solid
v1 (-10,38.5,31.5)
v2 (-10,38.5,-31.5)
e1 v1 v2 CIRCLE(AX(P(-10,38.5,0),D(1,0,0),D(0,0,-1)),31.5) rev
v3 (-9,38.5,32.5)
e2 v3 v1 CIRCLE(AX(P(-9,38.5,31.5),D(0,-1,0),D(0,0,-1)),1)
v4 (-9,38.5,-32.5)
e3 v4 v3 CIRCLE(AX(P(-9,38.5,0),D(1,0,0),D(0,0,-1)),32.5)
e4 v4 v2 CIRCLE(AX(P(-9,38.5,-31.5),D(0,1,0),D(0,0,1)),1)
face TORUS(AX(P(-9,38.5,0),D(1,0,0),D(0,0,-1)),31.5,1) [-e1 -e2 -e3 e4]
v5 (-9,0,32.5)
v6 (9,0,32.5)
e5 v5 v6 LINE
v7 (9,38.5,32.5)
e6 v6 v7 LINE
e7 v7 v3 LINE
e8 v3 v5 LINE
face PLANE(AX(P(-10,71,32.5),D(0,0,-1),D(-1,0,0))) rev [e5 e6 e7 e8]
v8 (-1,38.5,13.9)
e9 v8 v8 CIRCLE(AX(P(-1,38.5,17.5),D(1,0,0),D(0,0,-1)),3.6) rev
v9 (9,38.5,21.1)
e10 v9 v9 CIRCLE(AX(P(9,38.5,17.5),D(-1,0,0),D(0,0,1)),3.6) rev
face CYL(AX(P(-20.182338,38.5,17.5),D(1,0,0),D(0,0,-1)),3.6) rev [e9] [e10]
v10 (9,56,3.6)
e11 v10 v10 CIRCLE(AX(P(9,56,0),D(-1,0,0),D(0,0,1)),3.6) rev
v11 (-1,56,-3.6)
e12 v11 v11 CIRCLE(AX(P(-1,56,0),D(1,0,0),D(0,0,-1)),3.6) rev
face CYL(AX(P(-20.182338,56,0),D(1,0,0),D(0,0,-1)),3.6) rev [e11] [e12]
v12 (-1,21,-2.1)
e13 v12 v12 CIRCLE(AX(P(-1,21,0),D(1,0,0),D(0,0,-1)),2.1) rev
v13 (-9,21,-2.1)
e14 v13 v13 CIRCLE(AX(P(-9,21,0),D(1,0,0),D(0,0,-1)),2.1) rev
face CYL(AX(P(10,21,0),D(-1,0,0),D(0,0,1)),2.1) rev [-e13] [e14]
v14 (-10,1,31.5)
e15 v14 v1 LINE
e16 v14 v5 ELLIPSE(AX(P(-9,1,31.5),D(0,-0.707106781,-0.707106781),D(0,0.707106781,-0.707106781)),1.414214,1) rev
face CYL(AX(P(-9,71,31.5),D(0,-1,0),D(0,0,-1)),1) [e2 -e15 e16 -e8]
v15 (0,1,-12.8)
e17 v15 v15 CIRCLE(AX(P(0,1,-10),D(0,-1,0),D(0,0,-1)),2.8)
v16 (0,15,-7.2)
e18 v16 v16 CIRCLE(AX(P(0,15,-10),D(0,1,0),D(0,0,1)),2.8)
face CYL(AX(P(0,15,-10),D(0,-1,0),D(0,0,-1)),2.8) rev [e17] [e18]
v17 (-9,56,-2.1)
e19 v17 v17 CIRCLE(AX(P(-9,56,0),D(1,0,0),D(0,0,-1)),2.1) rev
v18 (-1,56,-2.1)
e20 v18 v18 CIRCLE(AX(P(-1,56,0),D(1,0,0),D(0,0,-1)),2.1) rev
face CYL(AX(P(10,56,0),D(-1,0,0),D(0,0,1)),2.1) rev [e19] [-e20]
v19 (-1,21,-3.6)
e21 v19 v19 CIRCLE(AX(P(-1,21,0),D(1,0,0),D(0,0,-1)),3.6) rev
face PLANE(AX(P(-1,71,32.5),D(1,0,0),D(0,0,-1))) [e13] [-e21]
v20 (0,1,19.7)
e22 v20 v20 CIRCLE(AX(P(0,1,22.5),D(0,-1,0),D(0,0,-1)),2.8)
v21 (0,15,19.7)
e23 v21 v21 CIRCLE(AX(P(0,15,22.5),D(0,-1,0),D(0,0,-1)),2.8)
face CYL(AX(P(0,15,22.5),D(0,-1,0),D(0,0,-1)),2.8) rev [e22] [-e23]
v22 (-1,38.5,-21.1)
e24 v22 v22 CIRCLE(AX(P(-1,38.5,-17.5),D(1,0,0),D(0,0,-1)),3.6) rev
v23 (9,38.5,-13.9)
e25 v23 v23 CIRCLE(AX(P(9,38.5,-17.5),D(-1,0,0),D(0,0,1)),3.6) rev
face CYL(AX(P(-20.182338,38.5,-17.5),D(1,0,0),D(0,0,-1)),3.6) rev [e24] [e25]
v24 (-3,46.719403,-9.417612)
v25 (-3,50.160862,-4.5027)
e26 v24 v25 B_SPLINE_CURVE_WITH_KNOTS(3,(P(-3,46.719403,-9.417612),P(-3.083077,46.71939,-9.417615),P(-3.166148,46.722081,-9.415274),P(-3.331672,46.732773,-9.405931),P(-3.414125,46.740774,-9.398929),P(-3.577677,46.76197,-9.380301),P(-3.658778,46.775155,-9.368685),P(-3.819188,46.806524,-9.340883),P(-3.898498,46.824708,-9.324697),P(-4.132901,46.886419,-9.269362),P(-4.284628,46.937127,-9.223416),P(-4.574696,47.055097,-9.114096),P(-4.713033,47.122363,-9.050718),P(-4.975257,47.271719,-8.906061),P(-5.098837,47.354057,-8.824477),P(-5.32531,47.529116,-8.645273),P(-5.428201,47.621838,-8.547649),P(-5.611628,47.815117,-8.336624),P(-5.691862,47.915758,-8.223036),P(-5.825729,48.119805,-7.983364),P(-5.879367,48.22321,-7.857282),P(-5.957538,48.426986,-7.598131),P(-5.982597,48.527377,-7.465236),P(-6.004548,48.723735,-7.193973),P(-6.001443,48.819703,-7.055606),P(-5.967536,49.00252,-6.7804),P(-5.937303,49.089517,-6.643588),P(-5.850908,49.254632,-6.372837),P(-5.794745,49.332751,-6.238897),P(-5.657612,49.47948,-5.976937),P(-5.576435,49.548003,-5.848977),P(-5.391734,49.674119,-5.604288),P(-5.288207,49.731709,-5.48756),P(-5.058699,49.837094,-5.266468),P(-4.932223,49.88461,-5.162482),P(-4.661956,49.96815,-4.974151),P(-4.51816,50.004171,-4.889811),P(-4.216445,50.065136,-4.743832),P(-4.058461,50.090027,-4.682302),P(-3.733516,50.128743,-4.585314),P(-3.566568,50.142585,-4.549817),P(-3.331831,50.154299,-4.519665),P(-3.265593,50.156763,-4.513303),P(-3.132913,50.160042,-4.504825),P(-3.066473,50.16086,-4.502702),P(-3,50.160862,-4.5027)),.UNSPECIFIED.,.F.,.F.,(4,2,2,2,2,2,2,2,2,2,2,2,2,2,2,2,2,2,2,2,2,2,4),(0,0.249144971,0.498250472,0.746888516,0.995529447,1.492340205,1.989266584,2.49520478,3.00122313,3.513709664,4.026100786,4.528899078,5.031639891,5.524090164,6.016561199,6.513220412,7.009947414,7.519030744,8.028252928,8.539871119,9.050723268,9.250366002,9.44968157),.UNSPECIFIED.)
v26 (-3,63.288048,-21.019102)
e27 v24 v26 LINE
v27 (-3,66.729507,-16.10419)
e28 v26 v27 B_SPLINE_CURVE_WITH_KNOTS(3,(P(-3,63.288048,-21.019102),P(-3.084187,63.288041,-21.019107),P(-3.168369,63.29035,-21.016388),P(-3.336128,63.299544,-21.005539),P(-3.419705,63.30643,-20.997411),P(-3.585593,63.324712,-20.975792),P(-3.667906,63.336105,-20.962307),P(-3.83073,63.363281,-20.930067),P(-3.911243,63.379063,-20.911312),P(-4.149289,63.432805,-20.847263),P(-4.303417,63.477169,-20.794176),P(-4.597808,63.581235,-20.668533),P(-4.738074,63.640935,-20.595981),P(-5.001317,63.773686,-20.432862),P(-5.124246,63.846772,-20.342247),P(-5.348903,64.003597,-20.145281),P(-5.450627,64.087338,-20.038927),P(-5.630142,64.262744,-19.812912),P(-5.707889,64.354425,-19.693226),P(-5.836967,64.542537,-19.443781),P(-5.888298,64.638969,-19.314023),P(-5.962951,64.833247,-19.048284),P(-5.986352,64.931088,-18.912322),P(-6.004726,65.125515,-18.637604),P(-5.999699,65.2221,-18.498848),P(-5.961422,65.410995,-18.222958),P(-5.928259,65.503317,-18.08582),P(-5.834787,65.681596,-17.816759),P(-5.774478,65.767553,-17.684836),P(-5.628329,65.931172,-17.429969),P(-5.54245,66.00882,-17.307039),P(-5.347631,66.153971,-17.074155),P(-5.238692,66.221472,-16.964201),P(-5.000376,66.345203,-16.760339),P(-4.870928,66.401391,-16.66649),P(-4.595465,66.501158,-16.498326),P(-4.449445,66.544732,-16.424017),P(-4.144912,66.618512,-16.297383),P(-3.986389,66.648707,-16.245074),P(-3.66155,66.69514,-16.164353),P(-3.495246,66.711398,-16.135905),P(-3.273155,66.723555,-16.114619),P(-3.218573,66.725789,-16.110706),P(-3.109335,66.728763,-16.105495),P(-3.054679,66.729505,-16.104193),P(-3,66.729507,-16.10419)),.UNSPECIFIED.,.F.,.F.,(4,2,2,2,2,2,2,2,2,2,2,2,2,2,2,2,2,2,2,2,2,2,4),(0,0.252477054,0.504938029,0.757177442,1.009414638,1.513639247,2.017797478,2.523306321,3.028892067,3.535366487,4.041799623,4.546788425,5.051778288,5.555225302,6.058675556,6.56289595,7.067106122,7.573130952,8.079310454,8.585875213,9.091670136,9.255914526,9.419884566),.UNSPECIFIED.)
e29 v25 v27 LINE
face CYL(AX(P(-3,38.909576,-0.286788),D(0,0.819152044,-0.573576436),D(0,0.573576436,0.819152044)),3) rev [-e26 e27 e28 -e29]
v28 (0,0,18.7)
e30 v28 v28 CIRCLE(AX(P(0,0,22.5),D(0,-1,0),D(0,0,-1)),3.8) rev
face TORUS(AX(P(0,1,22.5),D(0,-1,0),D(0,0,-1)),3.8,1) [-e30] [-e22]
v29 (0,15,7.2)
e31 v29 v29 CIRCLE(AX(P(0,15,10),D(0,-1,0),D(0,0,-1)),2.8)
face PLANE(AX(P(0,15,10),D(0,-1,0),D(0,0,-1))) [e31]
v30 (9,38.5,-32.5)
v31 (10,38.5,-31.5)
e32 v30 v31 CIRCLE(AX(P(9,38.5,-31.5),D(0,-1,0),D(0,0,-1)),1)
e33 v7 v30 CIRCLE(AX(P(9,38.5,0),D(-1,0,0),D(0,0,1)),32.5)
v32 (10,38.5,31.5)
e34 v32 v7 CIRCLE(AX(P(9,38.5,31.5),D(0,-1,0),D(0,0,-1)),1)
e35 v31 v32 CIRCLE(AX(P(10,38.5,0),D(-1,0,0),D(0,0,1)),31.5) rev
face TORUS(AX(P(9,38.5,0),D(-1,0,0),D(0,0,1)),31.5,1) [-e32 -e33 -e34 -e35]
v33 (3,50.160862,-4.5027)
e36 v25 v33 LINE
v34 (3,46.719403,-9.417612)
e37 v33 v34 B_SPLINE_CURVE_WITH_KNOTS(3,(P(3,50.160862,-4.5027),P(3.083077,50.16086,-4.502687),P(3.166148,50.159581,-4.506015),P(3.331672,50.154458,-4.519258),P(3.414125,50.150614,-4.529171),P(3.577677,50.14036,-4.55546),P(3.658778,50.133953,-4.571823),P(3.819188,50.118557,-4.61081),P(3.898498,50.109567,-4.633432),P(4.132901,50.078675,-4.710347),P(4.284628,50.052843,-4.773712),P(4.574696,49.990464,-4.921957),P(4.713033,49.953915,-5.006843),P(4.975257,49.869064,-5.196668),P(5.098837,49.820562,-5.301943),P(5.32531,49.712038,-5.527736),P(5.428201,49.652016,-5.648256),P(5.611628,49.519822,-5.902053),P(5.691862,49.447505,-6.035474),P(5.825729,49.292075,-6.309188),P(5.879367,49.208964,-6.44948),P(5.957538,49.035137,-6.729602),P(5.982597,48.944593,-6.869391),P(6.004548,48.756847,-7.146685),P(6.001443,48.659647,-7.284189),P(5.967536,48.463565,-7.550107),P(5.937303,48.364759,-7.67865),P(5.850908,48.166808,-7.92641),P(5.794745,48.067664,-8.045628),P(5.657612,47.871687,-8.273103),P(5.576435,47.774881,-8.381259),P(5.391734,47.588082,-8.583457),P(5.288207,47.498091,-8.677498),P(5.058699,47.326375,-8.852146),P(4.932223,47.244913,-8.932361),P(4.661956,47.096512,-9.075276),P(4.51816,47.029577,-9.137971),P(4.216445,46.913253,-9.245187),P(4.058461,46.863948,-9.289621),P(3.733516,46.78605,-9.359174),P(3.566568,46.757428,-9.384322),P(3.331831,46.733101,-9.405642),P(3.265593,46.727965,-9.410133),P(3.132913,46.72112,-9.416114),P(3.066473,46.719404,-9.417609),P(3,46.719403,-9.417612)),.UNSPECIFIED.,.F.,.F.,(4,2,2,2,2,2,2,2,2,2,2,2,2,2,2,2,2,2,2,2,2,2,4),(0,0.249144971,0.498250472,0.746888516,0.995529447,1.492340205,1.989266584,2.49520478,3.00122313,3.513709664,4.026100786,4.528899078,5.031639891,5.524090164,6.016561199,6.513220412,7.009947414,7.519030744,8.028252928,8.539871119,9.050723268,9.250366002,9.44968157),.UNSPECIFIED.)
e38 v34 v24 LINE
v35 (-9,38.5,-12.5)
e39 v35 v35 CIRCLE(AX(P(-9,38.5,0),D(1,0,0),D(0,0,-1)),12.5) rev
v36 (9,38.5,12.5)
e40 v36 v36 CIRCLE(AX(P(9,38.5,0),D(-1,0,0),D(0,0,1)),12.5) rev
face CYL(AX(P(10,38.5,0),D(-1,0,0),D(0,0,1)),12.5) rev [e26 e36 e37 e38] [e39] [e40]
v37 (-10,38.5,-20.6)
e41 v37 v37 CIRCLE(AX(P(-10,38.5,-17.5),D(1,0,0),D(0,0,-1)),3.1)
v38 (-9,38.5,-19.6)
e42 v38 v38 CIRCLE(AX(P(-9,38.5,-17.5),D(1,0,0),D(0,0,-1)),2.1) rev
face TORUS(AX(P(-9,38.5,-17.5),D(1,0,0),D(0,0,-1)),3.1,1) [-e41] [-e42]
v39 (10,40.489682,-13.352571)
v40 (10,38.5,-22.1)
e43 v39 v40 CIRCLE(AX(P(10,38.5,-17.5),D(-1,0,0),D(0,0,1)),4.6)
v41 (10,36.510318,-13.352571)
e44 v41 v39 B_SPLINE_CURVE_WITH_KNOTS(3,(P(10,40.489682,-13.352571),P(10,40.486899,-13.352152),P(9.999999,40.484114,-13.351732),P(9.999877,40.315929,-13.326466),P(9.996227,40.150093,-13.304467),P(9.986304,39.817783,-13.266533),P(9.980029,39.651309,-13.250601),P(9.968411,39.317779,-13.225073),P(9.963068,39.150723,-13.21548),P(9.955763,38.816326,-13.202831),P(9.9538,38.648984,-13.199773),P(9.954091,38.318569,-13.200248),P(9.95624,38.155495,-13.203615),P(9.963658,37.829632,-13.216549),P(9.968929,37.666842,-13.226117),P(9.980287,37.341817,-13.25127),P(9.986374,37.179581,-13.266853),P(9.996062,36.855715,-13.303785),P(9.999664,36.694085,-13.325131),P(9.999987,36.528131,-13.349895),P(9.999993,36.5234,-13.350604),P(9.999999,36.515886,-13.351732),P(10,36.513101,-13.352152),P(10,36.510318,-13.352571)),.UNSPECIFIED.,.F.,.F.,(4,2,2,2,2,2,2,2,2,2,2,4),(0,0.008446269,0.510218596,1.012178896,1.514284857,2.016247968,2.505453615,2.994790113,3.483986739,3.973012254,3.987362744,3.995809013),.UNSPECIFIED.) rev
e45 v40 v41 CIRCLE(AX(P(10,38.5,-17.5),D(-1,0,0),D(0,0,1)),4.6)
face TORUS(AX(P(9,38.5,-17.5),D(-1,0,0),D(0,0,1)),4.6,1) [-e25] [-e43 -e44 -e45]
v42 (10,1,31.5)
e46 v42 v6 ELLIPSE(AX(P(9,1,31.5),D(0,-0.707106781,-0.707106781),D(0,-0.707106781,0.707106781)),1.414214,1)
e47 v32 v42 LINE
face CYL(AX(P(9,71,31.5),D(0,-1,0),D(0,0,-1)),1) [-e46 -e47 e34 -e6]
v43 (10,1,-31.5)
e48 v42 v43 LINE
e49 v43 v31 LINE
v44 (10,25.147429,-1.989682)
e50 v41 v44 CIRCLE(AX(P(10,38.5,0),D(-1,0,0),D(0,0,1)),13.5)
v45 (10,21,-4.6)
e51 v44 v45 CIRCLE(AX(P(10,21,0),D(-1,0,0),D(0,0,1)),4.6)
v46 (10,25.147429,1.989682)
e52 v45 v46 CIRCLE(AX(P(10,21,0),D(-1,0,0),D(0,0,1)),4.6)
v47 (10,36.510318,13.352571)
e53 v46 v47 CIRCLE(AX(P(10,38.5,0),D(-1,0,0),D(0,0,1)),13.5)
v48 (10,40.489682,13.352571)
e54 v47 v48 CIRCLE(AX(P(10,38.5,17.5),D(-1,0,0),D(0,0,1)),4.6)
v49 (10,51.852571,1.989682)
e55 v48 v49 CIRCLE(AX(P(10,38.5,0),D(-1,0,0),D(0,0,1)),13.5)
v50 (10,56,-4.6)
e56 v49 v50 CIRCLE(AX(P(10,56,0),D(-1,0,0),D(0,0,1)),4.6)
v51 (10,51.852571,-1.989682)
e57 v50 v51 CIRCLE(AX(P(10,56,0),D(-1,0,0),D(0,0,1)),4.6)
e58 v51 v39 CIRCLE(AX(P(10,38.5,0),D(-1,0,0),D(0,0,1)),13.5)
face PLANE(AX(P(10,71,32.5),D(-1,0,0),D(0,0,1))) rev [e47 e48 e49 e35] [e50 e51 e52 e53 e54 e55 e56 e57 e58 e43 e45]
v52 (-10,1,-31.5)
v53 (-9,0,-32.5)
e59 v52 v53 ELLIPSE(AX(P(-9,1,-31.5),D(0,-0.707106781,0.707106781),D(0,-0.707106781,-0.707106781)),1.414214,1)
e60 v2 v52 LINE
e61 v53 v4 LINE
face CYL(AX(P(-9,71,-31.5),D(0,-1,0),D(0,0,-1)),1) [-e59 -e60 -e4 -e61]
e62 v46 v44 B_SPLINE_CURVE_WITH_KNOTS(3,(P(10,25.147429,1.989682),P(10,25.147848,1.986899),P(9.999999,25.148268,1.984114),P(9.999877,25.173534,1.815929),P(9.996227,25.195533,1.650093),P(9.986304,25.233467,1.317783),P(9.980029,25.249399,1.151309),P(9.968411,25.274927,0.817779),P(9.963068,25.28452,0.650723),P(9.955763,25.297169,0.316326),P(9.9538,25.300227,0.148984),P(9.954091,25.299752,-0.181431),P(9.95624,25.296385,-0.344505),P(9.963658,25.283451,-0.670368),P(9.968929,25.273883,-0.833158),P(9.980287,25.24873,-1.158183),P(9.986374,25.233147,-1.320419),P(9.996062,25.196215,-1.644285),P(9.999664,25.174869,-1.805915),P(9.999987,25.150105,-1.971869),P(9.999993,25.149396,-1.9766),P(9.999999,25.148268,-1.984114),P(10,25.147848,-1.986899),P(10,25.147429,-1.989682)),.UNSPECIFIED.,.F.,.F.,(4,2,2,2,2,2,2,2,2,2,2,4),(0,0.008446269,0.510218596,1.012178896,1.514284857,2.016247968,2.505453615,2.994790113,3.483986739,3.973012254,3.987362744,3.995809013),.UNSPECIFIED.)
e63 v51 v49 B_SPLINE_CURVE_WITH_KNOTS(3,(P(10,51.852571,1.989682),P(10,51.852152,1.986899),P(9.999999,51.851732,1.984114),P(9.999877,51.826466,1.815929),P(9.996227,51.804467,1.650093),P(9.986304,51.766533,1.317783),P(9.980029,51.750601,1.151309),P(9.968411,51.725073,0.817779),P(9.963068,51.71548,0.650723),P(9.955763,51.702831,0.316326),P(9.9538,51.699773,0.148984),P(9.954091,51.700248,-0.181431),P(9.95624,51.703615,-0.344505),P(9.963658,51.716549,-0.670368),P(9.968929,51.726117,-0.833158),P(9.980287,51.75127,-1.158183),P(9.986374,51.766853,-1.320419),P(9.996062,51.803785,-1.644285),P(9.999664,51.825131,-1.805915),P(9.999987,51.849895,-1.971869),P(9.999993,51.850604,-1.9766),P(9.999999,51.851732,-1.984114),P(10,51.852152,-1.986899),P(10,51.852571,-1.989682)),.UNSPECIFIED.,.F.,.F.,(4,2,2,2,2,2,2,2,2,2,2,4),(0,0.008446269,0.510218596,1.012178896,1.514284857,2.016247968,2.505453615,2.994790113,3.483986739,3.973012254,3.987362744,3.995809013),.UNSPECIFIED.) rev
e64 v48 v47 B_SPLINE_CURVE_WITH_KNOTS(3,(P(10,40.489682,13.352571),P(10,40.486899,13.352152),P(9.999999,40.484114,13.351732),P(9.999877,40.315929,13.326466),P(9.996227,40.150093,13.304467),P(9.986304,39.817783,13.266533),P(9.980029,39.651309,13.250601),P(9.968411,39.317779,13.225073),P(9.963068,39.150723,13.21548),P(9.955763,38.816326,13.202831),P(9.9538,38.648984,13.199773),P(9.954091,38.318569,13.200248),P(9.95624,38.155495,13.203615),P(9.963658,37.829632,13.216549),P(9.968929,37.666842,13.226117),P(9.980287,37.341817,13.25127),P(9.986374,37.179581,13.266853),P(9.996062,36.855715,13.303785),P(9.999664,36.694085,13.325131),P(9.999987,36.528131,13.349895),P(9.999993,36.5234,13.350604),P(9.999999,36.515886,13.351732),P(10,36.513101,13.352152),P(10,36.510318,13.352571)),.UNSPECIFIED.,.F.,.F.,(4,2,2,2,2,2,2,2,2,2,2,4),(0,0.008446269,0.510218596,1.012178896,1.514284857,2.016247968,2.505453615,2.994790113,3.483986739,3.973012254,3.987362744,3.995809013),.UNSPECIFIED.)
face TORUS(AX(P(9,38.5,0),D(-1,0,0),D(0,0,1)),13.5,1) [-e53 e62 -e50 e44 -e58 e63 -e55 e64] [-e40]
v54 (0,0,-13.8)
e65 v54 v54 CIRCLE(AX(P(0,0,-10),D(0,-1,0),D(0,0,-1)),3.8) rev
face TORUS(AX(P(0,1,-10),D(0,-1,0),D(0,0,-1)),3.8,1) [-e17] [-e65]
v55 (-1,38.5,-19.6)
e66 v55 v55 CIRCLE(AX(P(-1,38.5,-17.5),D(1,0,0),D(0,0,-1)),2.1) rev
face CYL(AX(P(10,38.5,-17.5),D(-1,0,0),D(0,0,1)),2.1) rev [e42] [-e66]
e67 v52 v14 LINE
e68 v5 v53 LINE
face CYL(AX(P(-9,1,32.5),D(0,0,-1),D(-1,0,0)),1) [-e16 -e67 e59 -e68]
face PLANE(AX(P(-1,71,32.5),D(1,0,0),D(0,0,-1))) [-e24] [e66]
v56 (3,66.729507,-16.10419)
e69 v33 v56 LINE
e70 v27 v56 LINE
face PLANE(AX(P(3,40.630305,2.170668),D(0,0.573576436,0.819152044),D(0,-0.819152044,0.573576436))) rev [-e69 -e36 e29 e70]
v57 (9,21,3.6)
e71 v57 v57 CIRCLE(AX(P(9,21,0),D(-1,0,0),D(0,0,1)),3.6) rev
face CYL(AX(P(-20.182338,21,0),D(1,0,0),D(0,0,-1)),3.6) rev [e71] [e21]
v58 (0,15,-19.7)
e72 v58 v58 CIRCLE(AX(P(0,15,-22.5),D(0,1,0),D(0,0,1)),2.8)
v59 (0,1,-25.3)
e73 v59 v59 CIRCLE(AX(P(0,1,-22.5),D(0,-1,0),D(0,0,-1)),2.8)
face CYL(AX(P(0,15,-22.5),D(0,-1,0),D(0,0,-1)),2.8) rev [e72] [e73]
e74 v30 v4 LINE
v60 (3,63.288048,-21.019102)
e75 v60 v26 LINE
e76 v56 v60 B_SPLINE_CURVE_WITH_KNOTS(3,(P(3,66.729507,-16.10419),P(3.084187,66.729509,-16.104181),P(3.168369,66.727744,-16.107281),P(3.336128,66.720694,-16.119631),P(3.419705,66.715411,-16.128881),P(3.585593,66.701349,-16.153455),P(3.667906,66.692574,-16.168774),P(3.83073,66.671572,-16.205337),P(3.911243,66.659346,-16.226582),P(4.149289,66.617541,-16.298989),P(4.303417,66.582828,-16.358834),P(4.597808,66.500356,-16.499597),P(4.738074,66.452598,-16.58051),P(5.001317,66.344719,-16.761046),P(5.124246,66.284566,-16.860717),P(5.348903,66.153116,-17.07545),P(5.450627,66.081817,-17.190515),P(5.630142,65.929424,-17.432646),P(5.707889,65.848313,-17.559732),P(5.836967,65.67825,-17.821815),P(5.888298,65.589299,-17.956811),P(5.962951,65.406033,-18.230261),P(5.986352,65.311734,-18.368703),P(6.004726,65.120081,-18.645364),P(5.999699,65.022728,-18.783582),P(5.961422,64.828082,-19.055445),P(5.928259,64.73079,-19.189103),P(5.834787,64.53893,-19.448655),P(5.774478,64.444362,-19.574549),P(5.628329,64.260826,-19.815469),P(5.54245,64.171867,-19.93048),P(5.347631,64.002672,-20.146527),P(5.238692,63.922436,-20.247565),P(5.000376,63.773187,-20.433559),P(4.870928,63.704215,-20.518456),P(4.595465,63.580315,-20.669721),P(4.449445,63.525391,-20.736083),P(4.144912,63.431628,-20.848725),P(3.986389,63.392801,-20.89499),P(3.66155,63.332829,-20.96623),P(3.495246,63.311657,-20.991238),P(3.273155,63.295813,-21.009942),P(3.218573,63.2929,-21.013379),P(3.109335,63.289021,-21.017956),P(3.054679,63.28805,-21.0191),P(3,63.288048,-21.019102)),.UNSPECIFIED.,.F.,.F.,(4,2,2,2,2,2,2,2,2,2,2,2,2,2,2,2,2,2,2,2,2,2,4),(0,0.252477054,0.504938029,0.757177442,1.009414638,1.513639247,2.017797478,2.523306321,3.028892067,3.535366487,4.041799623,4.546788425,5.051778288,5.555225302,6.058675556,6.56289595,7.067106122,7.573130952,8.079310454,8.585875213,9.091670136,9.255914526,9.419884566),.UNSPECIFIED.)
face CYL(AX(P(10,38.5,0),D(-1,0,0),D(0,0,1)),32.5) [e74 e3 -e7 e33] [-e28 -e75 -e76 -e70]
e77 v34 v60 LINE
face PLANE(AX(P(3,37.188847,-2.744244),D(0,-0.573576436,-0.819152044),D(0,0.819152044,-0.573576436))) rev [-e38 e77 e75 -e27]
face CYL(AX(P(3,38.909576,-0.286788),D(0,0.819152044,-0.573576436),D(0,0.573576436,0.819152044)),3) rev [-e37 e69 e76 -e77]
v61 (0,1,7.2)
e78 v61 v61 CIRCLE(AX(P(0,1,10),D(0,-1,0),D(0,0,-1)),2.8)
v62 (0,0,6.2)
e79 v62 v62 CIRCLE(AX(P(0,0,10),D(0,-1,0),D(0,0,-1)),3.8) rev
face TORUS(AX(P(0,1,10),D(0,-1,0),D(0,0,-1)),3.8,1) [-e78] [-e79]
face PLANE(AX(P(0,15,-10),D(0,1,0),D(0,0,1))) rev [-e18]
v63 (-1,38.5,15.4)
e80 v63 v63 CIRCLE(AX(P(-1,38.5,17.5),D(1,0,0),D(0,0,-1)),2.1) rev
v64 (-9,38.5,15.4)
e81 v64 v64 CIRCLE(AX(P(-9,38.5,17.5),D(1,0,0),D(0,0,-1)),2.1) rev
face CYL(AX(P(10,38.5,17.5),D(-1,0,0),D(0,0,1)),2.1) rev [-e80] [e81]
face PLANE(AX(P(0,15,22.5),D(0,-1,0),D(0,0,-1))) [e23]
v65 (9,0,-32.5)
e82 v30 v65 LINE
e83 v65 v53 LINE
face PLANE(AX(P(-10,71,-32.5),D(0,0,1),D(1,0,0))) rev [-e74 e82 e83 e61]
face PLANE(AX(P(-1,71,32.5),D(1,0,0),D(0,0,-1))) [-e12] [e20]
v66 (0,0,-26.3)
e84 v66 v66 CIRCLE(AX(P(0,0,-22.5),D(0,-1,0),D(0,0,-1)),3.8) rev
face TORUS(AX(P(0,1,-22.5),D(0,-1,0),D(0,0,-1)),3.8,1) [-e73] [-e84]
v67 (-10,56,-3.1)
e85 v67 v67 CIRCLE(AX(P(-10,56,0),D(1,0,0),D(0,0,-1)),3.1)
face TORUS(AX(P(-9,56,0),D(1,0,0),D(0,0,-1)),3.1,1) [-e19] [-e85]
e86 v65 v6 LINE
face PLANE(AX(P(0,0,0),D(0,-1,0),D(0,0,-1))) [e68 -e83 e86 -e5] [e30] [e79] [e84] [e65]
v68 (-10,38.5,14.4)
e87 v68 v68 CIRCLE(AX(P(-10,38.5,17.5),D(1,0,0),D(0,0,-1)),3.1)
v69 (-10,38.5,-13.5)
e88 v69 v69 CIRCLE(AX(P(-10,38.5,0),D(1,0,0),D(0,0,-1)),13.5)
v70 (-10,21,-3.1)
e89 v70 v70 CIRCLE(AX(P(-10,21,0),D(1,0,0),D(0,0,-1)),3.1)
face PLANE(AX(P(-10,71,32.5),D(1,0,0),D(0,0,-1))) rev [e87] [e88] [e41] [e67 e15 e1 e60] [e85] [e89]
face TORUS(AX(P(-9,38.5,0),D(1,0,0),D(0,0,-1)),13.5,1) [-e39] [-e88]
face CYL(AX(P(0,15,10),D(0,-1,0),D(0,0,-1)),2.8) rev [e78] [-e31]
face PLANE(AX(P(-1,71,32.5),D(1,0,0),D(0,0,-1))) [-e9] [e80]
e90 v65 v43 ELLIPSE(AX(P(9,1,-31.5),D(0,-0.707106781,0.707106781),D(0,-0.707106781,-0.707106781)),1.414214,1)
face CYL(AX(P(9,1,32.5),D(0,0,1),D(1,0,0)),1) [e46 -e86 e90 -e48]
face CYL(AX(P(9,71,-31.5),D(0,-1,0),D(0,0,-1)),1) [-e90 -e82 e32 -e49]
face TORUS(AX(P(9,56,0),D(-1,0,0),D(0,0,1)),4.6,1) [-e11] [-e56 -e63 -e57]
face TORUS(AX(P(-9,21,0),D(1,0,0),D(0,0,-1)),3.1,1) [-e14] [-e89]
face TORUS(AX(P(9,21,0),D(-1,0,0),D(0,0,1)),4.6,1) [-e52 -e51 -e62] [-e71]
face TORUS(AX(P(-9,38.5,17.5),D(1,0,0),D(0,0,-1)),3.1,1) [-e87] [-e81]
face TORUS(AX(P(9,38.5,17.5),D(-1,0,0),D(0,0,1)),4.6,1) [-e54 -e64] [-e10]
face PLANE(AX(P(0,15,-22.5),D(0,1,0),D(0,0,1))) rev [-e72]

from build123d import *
from build123d.topology import SkipClean

# Parameters (mm, degrees)
SKIZZE1_W                       = 20
SKIZZE1_H                       = 65
AUFSATZ_LINEAR_AUSTRAGEN1_DEPTH = 71
SKIZZE2_R                       = 12.500000000000002
SKIZZE2_R_2                     = 2.099999999999994
SKIZZE2_R_3                     = 2.1000000000003562
SKIZZE2_R_4                     = 2.100000000000001
SKIZZE2_R_5                     = 2.1000000000000014
SCHNITT_LINEAR_AUSTRAGEN1_DEPTH = 81.60552090272725
SKIZZE3_R                       = 2.8
SCHNITT_LINEAR_AUSTRAGEN2_DEPTH = 15
SKIZZE6_R                       = 3.5999999999999996
SKIZZE6_R_2                     = 3.599999999999999
SKIZZE6_R_3                     = 3.5999999999999988
SKIZZE6_R_4                     = 3.5999999999999974
SCHNITT_LINEAR_AUSTRAGEN5_DEPTH = 11
CUT_EXTRUDE1_DEPTH              = 32.000000000000014
VERRUNDUNG1_R                   = 1


with BuildPart() as part:
    # Skizze1 → Aufsatz-Linear austragen1 (new body)
    with BuildSketch(Plane(origin=(0, 0, 0), x_dir=(1, 0, 0), z_dir=(0, 1, 0))):
        Rectangle(SKIZZE1_W, SKIZZE1_H)
    extrude(amount=AUFSATZ_LINEAR_AUSTRAGEN1_DEPTH)

    # Skizze2 → Schnitt-Linear austragen1 (cut, through all)
    with BuildSketch(Plane.ZY.offset(9.999999999999998)):
        with BuildLine():
            Line((-32.5, 71), (-32.5, 38.49999999999999))
            ThreePointArc((-32.50000000000001, 38.5), (-22.980970429075402, 61.48097034805019), (-1.1458695682e-07, 71))
            Line((-1.1458696036e-07, 71), (-32.5, 71))
        make_face()
        with BuildLine():
            ThreePointArc((-1.1458695682e-07, 71), (22.980970348050192, 61.4809704290754), (32.50000000000001, 38.49999999999999))
            Line((32.5, 38.5), (32.5, 71))
            Line((32.5, 71), (-1.1458696036e-07, 71))
        make_face()
        with Locations((0, 38.49999999999999)):
            Circle(SKIZZE2_R)
        with Locations((17.500000000000007, 38.499999999999986)):
            Circle(SKIZZE2_R_2)
        with Locations((-3.5727e-13, 56)):
            Circle(SKIZZE2_R_3)
        with Locations((1.266e-14, 20.999999999999964)):
            Circle(SKIZZE2_R_4)
        with Locations((-17.500000000000007, 38.499999999999964)):
            Circle(SKIZZE2_R_5)
    extrude(amount=-SCHNITT_LINEAR_AUSTRAGEN1_DEPTH, mode=Mode.SUBTRACT)

    # Skizze3 → Schnitt-Linear austragen2 (cut)
    with BuildSketch(Plane.XZ):
        with Locations(Location((0, 22.5, 0), (0, 0, 270))):
            Circle(SKIZZE3_R)
        with Locations(Location((0, 9.999999999999998, 0), (0, 0, 270))):
            Circle(SKIZZE3_R)
        with Locations(Location((0, -9.999999999999998, 0), (0, 0, 90))):
            Circle(SKIZZE3_R)
        with Locations(Location((0, -22.5, 0), (0, 0, 90))):
            Circle(SKIZZE3_R)
    extrude(amount=-SCHNITT_LINEAR_AUSTRAGEN2_DEPTH, mode=Mode.SUBTRACT)

    # Skizze6 → Schnitt-Linear austragen5 (cut)
    with BuildSketch(Plane(origin=(10.000000000000002, 0, 0), x_dir=(0, 0, -1), z_dir=(1, 0, 0))):
        with Locations((-1.388e-14, 20.999999999999964)):
            Circle(SKIZZE6_R)
        with Locations((-17.50000000000003, 38.5)):
            Circle(SKIZZE6_R_2)
        with Locations((1.173e-14, 56.00000000000002)):
            Circle(SKIZZE6_R_3)
        with Locations((17.50000000000003, 38.49999999999998)):
            Circle(SKIZZE6_R_4)
    extrude(amount=-SCHNITT_LINEAR_AUSTRAGEN5_DEPTH, mode=Mode.SUBTRACT)

    # Sketch1 → Cut-Extrude1 (cut)
    with SkipClean():  # the faces are left unmerged after this step: merging them gives an invalid solid
        with BuildSketch(Plane(origin=(0, 52.4563291984119, -36.730317131537376), x_dir=(-1, 0, 0), z_dir=(0, 0.8191520442889972, -0.5735764363510384))):
            with BuildLine():
                Line((-3, 25.082692799514973), (3, 25.082692799514973))
                ThreePointArc((3, 25.082692799514973), (6, 22.082692799514973), (3, 19.082692799514973))
                Line((3, 19.082692799514973), (-3, 19.082692799514973))
                ThreePointArc((-3, 19.082692799514973), (-6, 22.082692799514973), (-3, 25.082692799514973))
            make_face()
        extrude(amount=-CUT_EXTRUDE1_DEPTH, mode=Mode.SUBTRACT)

    # Verrundung1
    # the kernel refuses this fillet: 1 mm, written as the material it takes off along each edge
    with BuildSketch(Plane(origin=(10.000000000000002, -2.4999999999999996, 32.5), x_dir=(-1, 0, 0), z_dir=(0, 1, 0))) as verrundung1_piece_1:
        with BuildLine():
            CenterArc((VERRUNDUNG1_R, -VERRUNDUNG1_R), VERRUNDUNG1_R, 90, 90)
            Line((0, -VERRUNDUNG1_R), (0, 0))
            Line((0, 0), (VERRUNDUNG1_R, 0))
        make_face()
    extrude(amount=41, mode=Mode.SUBTRACT)
    with BuildSketch(Plane(origin=(-9.999999999999998, -2.4999999999999996, 32.5), x_dir=(1, 0, 0), z_dir=(0, 1, 0))) as verrundung1_piece_2:
        with BuildLine():
            CenterArc((VERRUNDUNG1_R, VERRUNDUNG1_R), VERRUNDUNG1_R, 180, 90)
            Line((0, VERRUNDUNG1_R), (0, 0))
            Line((0, 0), (VERRUNDUNG1_R, 0))
        make_face()
    extrude(amount=41, mode=Mode.SUBTRACT)
    with BuildSketch(Plane(origin=(-9.999999999999998, 38.499999999999986, 1.78e-15), x_dir=(0, 4.4e-16, -1), z_dir=(0, -1, -4.4e-16))) as verrundung1_piece_3:
        with BuildLine():
            CenterArc((32.500000000000014 - VERRUNDUNG1_R, VERRUNDUNG1_R), VERRUNDUNG1_R, 269.99999999999875, 90.00000000000125)
            Line((32.500000000000014 - VERRUNDUNG1_R, 0), (32.500000000000014, 0))
            Line((32.500000000000014, 0), (32.500000000000036, VERRUNDUNG1_R))
        make_face()
    revolve(axis=Axis((-9.999999999999998, 38.499999999999986, 1.78e-15), (1, 0, 0)), revolution_arc=179.99999999999994, mode=Mode.SUBTRACT)
    with BuildSketch(Plane(origin=(10.000000000000002, 38.499999999999986, 1.78e-15), x_dir=(0, 4.4e-16, -1), z_dir=(0, -1, -4.4e-16))) as verrundung1_piece_4:
        with BuildLine():
            CenterArc((32.500000000000014 - VERRUNDUNG1_R, -VERRUNDUNG1_R), VERRUNDUNG1_R, 0, 90)
            Line((32.500000000000014, -VERRUNDUNG1_R), (32.500000000000014, 0))
            Line((32.500000000000014, 0), (32.500000000000014 - VERRUNDUNG1_R, 0))
        make_face()
    revolve(axis=Axis((10.000000000000002, 38.499999999999986, 1.78e-15), (1, 0, 0)), revolution_arc=179.99999999999994, mode=Mode.SUBTRACT)
    with BuildSketch(Plane(origin=(-9.999999999999998, -2.4999999999999996, -32.5), x_dir=(0, 0, 1), z_dir=(0, 1, 0))) as verrundung1_piece_5:
        with BuildLine():
            CenterArc((VERRUNDUNG1_R, VERRUNDUNG1_R), VERRUNDUNG1_R, 180, 90)
            Line((0, VERRUNDUNG1_R), (0, 0))
            Line((0, 0), (VERRUNDUNG1_R, 0))
        make_face()
    extrude(amount=41, mode=Mode.SUBTRACT)
    with BuildSketch(Plane(origin=(10.000000000000002, -2.4999999999999996, -32.5), x_dir=(0, 0, 1), z_dir=(0, 1, 0))) as verrundung1_piece_6:
        with BuildLine():
            CenterArc((VERRUNDUNG1_R, -VERRUNDUNG1_R), VERRUNDUNG1_R, 90, 90)
            Line((0, -VERRUNDUNG1_R), (0, 0))
            Line((0, 0), (VERRUNDUNG1_R, 0))
        make_face()
    extrude(amount=41, mode=Mode.SUBTRACT)
    with BuildSketch(Plane(origin=(10.000000000000002, 38.49999999999999, 0), x_dir=(0, 0, 1), z_dir=(0, -1, 0))) as verrundung1_piece_7:
        with BuildLine():
            CenterArc((12.500000000000002 + VERRUNDUNG1_R, VERRUNDUNG1_R), VERRUNDUNG1_R, 180, 90)
            Line((12.5, VERRUNDUNG1_R), (12.500000000000002, 0))
            Line((12.500000000000002, 0), (12.500000000000002 + VERRUNDUNG1_R, 0))
        make_face()
    revolve(axis=Axis((10.000000000000002, 38.49999999999999, 0), (-1, 0, 0)), mode=Mode.SUBTRACT)
    with BuildSketch(Plane(origin=(-9.999999999999998, 38.49999999999999, 0), x_dir=(0, 0, 1), z_dir=(0, -1, 0))) as verrundung1_piece_8:
        with BuildLine():
            CenterArc((12.500000000000002 + VERRUNDUNG1_R, -VERRUNDUNG1_R), VERRUNDUNG1_R, 90, 90)
            Line((12.5, -VERRUNDUNG1_R), (12.500000000000002, 0))
            Line((12.500000000000002, 0), (12.500000000000002 + VERRUNDUNG1_R, 0))
        make_face()
    revolve(axis=Axis((-9.999999999999998, 38.49999999999999, 0), (-1, 0, 0)), mode=Mode.SUBTRACT)
    with BuildSketch(Plane(origin=(-9.999999999999998, 20.999999999999964, 1.266e-14), x_dir=(0, 0, 1), z_dir=(0, -1, 0))) as verrundung1_piece_9:
        with BuildLine():
            CenterArc((2.1000000000000014 + VERRUNDUNG1_R, -VERRUNDUNG1_R), VERRUNDUNG1_R, 90, 90)
            Line((2.100000000000003, -VERRUNDUNG1_R), (2.1000000000000014, 0))
            Line((2.1000000000000014, 0), (2.1000000000000014 + VERRUNDUNG1_R, 0))
        make_face()
    revolve(axis=Axis((-9.999999999999998, 20.999999999999964, 1.266e-14), (-1, 0, 0)), mode=Mode.SUBTRACT)
    with BuildSketch(Plane(origin=(-9.999999999999998, 56, -3.5727e-13), x_dir=(0, 0, 1), z_dir=(0, -1, 0))) as verrundung1_piece_10:
        with BuildLine():
            CenterArc((2.100000000000356 + VERRUNDUNG1_R, -VERRUNDUNG1_R), VERRUNDUNG1_R, 90, 90)
            Line((2.1000000000003585, -VERRUNDUNG1_R), (2.100000000000356, 0))
            Line((2.100000000000356, 0), (2.100000000000356 + VERRUNDUNG1_R, 0))
        make_face()
    revolve(axis=Axis((-9.999999999999998, 56, -3.5727e-13), (-1, 0, 0)), mode=Mode.SUBTRACT)
    with BuildSketch(Plane(origin=(-9.999999999999998, 38.499999999999964, -17.500000000000007), x_dir=(0, 0, 1), z_dir=(0, -1, 0))) as verrundung1_piece_11:
        with BuildLine():
            CenterArc((2.1000000000000014 + VERRUNDUNG1_R, -VERRUNDUNG1_R), VERRUNDUNG1_R, 90, 90)
            Line((2.1000000000000014, -VERRUNDUNG1_R), (2.1000000000000014, 0))
            Line((2.1000000000000014, 0), (2.1000000000000014 + VERRUNDUNG1_R, 0))
        make_face()
    revolve(axis=Axis((-9.999999999999998, 38.499999999999964, -17.500000000000007), (-1, 0, 0)), mode=Mode.SUBTRACT)
    with BuildSketch(Plane(origin=(-9.999999999999998, 38.499999999999986, 17.500000000000007), x_dir=(0, 0, 1), z_dir=(0, -1, 0))) as verrundung1_piece_12:
        with BuildLine():
            CenterArc((2.0999999999999943 + VERRUNDUNG1_R, -VERRUNDUNG1_R), VERRUNDUNG1_R, 90, 90)
            Line((2.0999999999999943, -VERRUNDUNG1_R), (2.0999999999999943, 0))
            Line((2.0999999999999943, 0), (2.0999999999999943 + VERRUNDUNG1_R, 0))
        make_face()
    revolve(axis=Axis((-9.999999999999998, 38.499999999999986, 17.500000000000007), (-1, 0, 0)), mode=Mode.SUBTRACT)
    with BuildSketch(Plane(origin=(-9.999999999999998, 0, -35), x_dir=(1, 0, 0), z_dir=(0, 0, 1)), Plane(origin=(10.000000000000002, 0, 35), x_dir=(-1, 0, 0), z_dir=(0, 0, -1))) as verrundung1_piece_13:
        with BuildLine():
            CenterArc((VERRUNDUNG1_R, VERRUNDUNG1_R), VERRUNDUNG1_R, 180, 90)
            Line((0, VERRUNDUNG1_R), (0, 0))
            Line((0, 0), (VERRUNDUNG1_R, 0))
        make_face()
    extrude(amount=70, mode=Mode.SUBTRACT)
    with BuildSketch(Plane(origin=(0, 0, 22.5), x_dir=(-1.8e-16, 0, -1), z_dir=(-1, 0, 1.8e-16))) as verrundung1_piece_14:
        with BuildLine():
            CenterArc((2.8000000000000007 + VERRUNDUNG1_R, -VERRUNDUNG1_R), VERRUNDUNG1_R, 90, 90)
            Line((2.8000000000000007, -VERRUNDUNG1_R), (2.8000000000000007, 0))
            Line((2.8000000000000007, 0), (2.8000000000000007 + VERRUNDUNG1_R, 0))
        make_face()
    revolve(axis=Axis((0, 0, 22.5), (0, -1, 0)), mode=Mode.SUBTRACT)
    with BuildSketch(Plane(origin=(0, 0, 9.999999999999998), x_dir=(-1.8e-16, 0, -1), z_dir=(-1, 0, 1.8e-16))) as verrundung1_piece_15:
        with BuildLine():
            CenterArc((2.8 + VERRUNDUNG1_R, -VERRUNDUNG1_R), VERRUNDUNG1_R, 90, 90)
            Line((2.8, -VERRUNDUNG1_R), (2.8, 0))
            Line((2.8, 0), (2.8 + VERRUNDUNG1_R, 0))
        make_face()
    revolve(axis=Axis((0, 0, 9.999999999999998), (0, -1, 0)), mode=Mode.SUBTRACT)
    with BuildSketch(Plane(origin=(0, 0, -9.999999999999998), x_dir=(6e-17, 0, 1), z_dir=(1, 0, -6e-17))) as verrundung1_piece_16:
        with BuildLine():
            CenterArc((2.8 + VERRUNDUNG1_R, -VERRUNDUNG1_R), VERRUNDUNG1_R, 90, 90)
            Line((2.8, -VERRUNDUNG1_R), (2.8, 0))
            Line((2.8, 0), (2.8 + VERRUNDUNG1_R, 0))
        make_face()
    revolve(axis=Axis((0, 0, -9.999999999999998), (0, -1, 0)), mode=Mode.SUBTRACT)
    with BuildSketch(Plane(origin=(0, 0, -22.5), x_dir=(6e-17, 0, 1), z_dir=(1, 0, -6e-17))) as verrundung1_piece_17:
        with BuildLine():
            CenterArc((2.8000000000000007 + VERRUNDUNG1_R, -VERRUNDUNG1_R), VERRUNDUNG1_R, 90, 90)
            Line((2.8000000000000007, -VERRUNDUNG1_R), (2.8000000000000007, 0))
            Line((2.8000000000000007, 0), (2.8000000000000007 + VERRUNDUNG1_R, 0))
        make_face()
    revolve(axis=Axis((0, 0, -22.5), (0, -1, 0)), mode=Mode.SUBTRACT)
    with BuildSketch(Plane(origin=(10.000000000000002, 38.5, 17.50000000000003), x_dir=(0, 0, -1), z_dir=(0, -1, 0))) as verrundung1_piece_18:
        with BuildLine():
            CenterArc((3.5999999999999996 + VERRUNDUNG1_R, -VERRUNDUNG1_R), VERRUNDUNG1_R, 90, 90)
            Line((3.6000000000000014, -VERRUNDUNG1_R), (3.5999999999999996, 0))
            Line((3.5999999999999996, 0), (3.5999999999999996 + VERRUNDUNG1_R, 0))
        make_face()
    revolve(axis=Axis((10.000000000000002, 38.5, 17.50000000000003), (1, 0, 0)), mode=Mode.SUBTRACT)
    with BuildSketch(Plane(origin=(10.000000000000002, 56.00000000000002, -1.173e-14), x_dir=(0, 0, -1), z_dir=(0, -1, 0))) as verrundung1_piece_19:
        with BuildLine():
            CenterArc((3.5999999999999988 + VERRUNDUNG1_R, -VERRUNDUNG1_R), VERRUNDUNG1_R, 90, 90)
            Line((3.599999999999997, -VERRUNDUNG1_R), (3.5999999999999988, 0))
            Line((3.5999999999999988, 0), (3.5999999999999988 + VERRUNDUNG1_R, 0))
        make_face()
    revolve(axis=Axis((10.000000000000002, 56.00000000000002, -1.173e-14), (1, 0, 0)), mode=Mode.SUBTRACT)
    with BuildSketch(Plane(origin=(10.000000000000002, 38.49999999999998, -17.50000000000003), x_dir=(0, 0, -1), z_dir=(0, -1, 0))) as verrundung1_piece_20:
        with BuildLine():
            CenterArc((3.599999999999998 + VERRUNDUNG1_R, -VERRUNDUNG1_R), VERRUNDUNG1_R, 90, 90)
            Line((3.5999999999999943, -VERRUNDUNG1_R), (3.599999999999998, 0))
            Line((3.599999999999998, 0), (3.599999999999998 + VERRUNDUNG1_R, 0))
        make_face()
    revolve(axis=Axis((10.000000000000002, 38.49999999999998, -17.50000000000003), (1, 0, 0)), mode=Mode.SUBTRACT)
    with BuildSketch(Plane(origin=(10.000000000000002, 20.999999999999964, 1.388e-14), x_dir=(0, 0, -1), z_dir=(0, -1, 0))) as verrundung1_piece_21:
        with BuildLine():
            CenterArc((3.5999999999999996 + VERRUNDUNG1_R, -VERRUNDUNG1_R), VERRUNDUNG1_R, 90, 90)
            Line((3.600000000000001, -VERRUNDUNG1_R), (3.5999999999999996, 0))
            Line((3.5999999999999996, 0), (3.5999999999999996 + VERRUNDUNG1_R, 0))
        make_face()
    revolve(axis=Axis((10.000000000000002, 20.999999999999964, 1.388e-14), (1, 0, 0)), mode=Mode.SUBTRACT)


solid = part.part
